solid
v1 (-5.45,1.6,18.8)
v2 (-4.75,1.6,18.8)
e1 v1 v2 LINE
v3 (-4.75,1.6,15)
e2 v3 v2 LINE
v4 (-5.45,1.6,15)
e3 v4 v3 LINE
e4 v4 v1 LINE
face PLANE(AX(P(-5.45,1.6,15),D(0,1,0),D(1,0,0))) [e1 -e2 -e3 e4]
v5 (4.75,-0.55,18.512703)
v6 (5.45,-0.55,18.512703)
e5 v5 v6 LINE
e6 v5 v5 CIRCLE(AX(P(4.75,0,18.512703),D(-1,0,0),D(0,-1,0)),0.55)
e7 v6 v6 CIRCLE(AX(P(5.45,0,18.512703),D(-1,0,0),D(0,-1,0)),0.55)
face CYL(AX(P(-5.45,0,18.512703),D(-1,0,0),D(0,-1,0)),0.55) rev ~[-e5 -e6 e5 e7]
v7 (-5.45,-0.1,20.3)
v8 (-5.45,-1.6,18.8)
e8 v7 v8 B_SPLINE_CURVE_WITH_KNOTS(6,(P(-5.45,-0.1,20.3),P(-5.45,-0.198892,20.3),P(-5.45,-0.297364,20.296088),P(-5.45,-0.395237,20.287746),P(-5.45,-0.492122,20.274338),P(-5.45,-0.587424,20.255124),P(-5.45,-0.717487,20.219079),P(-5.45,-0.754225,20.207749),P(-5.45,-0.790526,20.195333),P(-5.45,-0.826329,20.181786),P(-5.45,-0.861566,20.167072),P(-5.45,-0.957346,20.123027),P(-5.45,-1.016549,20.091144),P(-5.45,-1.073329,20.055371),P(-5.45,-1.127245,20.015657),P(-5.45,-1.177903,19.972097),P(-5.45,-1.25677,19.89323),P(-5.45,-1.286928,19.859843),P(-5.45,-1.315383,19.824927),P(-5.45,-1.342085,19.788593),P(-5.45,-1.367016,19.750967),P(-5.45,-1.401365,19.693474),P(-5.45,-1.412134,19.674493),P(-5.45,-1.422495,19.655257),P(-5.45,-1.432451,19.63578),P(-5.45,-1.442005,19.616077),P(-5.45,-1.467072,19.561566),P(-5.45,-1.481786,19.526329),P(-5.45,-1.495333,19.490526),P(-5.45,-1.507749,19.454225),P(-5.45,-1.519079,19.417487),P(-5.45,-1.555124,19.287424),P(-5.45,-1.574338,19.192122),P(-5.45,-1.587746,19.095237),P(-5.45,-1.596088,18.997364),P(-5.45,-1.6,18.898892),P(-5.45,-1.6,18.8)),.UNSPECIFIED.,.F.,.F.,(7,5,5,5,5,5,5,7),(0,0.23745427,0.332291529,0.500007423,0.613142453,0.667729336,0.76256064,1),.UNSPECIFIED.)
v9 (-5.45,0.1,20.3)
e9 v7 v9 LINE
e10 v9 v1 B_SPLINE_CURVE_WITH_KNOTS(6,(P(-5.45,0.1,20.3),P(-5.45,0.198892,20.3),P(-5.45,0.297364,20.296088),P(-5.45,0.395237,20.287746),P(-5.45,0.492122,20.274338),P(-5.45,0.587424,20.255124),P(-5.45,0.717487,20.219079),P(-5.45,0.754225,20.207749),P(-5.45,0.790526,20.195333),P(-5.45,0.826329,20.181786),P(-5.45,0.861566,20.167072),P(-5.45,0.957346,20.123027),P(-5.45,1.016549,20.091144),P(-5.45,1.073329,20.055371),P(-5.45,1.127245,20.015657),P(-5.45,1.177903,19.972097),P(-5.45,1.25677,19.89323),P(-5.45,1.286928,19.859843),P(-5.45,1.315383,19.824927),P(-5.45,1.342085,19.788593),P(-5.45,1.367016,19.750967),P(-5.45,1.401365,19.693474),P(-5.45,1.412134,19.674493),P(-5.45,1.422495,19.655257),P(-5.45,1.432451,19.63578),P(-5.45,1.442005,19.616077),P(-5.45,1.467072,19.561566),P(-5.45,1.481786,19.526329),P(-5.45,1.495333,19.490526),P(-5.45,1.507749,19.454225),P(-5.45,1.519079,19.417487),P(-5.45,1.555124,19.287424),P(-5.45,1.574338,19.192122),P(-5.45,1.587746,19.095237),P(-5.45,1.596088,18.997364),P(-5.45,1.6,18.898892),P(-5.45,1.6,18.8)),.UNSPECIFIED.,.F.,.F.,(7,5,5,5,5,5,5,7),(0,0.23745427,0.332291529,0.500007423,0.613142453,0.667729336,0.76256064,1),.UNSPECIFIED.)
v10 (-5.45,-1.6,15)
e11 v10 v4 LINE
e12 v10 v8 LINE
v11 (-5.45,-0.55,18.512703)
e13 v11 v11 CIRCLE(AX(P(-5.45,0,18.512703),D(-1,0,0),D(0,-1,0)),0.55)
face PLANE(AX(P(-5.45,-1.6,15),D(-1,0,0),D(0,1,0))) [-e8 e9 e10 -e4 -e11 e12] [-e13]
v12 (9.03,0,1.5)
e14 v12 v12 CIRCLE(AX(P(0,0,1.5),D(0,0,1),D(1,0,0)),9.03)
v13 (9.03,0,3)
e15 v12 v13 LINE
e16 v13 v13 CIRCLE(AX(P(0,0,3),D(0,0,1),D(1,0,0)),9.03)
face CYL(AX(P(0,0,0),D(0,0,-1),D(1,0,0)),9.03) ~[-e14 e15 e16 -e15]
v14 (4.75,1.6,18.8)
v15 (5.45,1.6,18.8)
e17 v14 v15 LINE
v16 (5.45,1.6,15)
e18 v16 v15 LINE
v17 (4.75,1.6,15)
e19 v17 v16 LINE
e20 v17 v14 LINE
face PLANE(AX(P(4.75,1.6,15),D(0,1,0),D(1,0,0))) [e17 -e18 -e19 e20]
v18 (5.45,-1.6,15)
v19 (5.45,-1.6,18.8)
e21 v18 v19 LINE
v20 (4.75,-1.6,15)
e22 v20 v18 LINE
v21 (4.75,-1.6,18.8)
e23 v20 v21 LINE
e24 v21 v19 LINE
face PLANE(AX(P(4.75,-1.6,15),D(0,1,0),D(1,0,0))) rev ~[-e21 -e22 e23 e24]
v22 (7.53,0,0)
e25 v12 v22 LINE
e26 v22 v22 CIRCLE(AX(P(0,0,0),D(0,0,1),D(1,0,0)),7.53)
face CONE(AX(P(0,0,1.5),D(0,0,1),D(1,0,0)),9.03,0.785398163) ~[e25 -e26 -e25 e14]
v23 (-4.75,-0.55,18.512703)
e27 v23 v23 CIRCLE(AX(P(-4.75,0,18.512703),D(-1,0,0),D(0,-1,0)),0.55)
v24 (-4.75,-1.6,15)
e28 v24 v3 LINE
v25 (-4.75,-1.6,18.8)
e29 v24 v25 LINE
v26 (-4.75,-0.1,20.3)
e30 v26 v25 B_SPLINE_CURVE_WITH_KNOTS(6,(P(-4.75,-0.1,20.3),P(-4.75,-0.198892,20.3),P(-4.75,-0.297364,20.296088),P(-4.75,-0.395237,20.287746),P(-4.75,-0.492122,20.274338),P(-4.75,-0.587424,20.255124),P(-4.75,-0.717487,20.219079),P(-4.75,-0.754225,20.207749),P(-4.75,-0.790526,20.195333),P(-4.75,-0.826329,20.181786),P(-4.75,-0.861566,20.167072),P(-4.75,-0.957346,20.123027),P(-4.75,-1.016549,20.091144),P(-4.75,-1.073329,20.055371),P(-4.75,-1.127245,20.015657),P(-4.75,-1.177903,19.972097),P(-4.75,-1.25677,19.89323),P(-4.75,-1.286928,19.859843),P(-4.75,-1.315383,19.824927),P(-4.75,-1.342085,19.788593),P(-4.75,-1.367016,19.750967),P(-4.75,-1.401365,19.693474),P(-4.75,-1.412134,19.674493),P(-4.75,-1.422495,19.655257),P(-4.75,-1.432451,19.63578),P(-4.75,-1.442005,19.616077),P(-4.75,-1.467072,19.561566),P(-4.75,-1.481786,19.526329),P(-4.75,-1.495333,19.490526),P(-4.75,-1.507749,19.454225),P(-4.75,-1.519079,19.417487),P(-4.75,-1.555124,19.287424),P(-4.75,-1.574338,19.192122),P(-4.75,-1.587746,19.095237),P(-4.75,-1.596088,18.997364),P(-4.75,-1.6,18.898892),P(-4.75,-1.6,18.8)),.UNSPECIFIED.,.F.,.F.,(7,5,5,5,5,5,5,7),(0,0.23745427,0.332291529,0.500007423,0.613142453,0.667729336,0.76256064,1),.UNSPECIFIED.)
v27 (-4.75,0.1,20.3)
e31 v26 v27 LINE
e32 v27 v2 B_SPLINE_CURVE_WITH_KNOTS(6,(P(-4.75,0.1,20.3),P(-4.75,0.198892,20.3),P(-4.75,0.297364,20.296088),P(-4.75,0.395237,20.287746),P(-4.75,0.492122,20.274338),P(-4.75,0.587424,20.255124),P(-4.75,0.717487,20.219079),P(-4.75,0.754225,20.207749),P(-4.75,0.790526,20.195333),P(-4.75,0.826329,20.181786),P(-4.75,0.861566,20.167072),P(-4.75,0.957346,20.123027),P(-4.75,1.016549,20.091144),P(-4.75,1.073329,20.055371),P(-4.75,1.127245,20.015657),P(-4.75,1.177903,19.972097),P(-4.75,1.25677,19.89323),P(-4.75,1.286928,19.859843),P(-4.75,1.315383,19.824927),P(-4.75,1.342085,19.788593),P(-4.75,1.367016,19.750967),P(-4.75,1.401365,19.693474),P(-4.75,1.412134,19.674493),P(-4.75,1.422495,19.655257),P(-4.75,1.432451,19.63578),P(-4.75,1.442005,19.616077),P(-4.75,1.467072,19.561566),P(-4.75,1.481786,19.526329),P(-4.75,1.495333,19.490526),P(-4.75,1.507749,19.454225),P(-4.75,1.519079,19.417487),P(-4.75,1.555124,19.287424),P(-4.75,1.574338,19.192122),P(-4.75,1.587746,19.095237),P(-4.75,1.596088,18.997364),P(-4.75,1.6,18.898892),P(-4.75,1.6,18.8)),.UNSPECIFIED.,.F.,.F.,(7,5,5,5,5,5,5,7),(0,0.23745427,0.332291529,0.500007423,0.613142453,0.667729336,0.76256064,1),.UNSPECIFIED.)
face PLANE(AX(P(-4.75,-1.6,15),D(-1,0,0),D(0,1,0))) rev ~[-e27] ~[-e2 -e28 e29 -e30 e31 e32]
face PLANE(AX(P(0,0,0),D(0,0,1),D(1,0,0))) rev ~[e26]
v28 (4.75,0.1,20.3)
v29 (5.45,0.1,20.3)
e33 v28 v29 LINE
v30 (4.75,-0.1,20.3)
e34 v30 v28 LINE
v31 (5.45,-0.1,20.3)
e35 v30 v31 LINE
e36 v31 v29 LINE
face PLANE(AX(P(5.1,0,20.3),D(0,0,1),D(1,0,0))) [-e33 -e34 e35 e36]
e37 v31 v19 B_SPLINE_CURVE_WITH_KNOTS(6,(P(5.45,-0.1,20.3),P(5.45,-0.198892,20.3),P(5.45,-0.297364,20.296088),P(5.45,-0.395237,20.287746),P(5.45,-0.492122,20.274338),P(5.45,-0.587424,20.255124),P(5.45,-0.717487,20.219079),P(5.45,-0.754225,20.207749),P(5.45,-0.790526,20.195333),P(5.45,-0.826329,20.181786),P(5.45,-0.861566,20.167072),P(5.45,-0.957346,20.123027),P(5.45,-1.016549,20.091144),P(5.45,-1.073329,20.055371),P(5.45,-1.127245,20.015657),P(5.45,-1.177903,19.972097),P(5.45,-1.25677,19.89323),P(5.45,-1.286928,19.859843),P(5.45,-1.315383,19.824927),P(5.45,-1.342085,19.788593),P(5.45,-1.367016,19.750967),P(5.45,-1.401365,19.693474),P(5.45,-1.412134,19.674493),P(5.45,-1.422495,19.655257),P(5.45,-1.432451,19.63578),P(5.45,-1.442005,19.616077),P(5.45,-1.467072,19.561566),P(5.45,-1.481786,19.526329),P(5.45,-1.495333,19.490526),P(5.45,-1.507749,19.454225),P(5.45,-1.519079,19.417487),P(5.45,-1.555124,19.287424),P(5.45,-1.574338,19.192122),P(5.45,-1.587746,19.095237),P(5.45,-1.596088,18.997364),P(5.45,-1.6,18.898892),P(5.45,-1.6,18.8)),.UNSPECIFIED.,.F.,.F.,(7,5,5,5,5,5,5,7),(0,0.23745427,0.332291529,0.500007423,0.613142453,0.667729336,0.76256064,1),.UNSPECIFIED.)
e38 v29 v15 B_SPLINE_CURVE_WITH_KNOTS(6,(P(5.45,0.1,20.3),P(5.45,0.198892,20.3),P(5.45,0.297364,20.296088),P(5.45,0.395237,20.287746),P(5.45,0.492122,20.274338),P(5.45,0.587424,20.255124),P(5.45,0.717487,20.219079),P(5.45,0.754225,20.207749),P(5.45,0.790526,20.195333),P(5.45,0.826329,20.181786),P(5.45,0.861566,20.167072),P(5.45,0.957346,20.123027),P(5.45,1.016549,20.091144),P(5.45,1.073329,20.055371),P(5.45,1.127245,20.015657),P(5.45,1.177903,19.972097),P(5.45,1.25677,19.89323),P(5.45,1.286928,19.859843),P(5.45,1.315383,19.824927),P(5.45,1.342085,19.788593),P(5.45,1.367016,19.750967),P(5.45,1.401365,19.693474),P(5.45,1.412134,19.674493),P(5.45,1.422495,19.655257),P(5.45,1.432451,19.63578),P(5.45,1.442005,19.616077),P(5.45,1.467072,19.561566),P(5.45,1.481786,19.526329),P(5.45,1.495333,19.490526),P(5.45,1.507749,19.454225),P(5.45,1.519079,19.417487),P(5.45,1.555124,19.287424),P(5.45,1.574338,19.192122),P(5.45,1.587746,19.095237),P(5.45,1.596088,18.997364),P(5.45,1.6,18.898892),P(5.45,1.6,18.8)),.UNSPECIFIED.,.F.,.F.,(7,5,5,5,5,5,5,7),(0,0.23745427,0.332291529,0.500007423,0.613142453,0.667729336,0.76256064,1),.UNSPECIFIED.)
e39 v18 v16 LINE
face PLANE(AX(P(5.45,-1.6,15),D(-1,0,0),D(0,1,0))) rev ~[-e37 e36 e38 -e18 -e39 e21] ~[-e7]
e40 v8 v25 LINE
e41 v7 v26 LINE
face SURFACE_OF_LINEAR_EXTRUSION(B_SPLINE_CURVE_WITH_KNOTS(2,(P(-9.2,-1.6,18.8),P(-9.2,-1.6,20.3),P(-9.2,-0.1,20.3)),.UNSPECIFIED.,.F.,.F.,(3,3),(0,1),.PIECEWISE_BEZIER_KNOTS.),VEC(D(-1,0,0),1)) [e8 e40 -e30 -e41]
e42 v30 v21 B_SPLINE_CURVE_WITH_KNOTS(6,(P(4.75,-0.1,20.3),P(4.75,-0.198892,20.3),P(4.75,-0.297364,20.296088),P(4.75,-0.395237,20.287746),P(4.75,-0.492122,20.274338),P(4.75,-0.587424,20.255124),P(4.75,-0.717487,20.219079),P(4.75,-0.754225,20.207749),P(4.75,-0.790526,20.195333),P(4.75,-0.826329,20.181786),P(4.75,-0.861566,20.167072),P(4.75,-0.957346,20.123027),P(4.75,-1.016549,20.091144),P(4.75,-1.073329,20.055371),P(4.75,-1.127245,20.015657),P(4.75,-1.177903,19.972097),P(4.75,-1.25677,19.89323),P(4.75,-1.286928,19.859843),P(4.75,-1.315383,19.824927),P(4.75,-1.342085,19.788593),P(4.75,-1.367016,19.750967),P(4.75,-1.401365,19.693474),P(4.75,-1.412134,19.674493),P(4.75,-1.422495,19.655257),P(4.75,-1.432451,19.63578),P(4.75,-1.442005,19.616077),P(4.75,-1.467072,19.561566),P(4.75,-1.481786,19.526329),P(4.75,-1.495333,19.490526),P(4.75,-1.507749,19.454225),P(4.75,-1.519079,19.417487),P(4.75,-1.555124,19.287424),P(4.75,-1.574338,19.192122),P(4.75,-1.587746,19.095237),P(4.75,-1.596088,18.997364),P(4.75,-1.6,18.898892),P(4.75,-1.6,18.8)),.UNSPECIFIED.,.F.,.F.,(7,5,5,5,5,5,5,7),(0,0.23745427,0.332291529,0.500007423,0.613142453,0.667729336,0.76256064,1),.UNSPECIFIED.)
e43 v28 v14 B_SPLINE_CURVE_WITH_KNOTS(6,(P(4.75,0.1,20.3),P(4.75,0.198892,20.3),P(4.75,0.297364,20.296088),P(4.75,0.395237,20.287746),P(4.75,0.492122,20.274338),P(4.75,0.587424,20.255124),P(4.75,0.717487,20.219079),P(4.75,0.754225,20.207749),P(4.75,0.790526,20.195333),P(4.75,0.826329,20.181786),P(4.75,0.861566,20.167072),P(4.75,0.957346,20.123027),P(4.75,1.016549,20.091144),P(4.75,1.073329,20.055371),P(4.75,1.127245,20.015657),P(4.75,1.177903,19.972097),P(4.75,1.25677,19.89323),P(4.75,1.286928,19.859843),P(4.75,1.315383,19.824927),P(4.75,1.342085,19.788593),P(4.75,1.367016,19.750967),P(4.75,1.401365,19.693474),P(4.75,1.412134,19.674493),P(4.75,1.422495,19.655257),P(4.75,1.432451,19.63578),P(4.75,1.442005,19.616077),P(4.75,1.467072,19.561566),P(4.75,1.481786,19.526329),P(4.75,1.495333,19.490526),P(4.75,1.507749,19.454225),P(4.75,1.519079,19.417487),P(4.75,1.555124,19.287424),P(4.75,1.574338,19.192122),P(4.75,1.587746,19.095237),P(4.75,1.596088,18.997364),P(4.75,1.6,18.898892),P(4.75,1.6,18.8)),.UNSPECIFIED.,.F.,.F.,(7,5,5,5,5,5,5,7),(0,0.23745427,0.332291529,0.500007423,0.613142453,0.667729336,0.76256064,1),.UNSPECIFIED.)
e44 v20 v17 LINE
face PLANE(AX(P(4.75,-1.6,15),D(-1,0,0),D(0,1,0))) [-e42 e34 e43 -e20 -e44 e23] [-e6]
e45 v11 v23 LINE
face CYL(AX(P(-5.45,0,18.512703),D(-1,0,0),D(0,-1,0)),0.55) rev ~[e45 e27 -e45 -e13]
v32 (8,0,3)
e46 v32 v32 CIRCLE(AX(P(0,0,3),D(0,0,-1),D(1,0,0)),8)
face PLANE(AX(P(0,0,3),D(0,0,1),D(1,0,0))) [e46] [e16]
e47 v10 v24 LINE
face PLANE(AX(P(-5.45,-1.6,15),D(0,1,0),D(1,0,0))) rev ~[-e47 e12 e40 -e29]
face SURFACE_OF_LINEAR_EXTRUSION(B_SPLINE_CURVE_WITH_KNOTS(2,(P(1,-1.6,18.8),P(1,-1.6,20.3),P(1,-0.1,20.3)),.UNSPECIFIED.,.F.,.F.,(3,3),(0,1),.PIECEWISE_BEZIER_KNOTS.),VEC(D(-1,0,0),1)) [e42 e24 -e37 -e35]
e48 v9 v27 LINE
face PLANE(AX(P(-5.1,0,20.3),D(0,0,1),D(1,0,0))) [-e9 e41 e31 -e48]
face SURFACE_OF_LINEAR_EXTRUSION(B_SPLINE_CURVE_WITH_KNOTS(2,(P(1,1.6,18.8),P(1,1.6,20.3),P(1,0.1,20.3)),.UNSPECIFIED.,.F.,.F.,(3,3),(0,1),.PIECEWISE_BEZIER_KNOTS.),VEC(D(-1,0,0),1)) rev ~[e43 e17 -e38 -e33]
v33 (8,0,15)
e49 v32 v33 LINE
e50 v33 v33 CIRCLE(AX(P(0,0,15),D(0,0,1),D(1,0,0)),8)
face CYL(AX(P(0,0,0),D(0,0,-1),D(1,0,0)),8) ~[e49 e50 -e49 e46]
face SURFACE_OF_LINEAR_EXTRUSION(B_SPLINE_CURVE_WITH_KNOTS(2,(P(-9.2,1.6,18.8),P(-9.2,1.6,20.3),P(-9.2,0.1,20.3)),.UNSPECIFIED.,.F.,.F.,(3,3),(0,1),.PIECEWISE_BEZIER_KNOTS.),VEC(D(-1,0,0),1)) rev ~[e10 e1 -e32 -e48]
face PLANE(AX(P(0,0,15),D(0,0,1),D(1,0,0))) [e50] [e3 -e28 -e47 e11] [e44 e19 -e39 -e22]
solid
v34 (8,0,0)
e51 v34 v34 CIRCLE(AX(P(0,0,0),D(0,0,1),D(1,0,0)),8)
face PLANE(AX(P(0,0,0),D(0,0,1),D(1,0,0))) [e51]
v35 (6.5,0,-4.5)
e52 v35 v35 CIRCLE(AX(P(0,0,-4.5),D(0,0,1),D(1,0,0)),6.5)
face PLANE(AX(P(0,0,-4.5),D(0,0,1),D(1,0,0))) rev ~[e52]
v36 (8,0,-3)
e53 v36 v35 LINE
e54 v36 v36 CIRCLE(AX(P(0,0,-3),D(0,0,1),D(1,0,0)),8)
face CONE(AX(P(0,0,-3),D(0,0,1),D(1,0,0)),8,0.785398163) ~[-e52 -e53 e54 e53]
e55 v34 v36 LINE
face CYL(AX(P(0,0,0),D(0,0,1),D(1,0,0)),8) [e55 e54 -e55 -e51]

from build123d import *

# Parameters (mm, degrees)
F0_R        = 8
F1_DEPTH    = 15
F0_R_2      = 9.03
F2_DEPTH    = 3
F3_DEPTH    = 4.5
F4_SIZE     = 1.5
F4_2_SIZE   = 1.5
F5_W        = 0.7
F5_H        = 3.2
F6_DEPTH    = 5.3
F7_R        = 0.55
F8_DEPTH    = 25
F9_T1_DEPTH = 8.2
F9_T3_DEPTH = 8.2


# Not quite as in the source:
# - a fillet or chamfer that OpenCascade refuses, or shapes differently, is made with other operations: its cross-section is extruded or revolved along the edge and cut away or added


with BuildPart() as f1:
    # F0 (on Top) → F1 (new body)
    with BuildSketch(Plane.XY):
        Circle(F0_R)
    extrude(amount=F1_DEPTH)

    # F0 (on Top) → F2 (join)
    with BuildSketch(Plane.XY):
        Circle(F0_R_2)
        Circle(F0_R, mode=Mode.SUBTRACT)
        Circle(F0_R)
    extrude(amount=F2_DEPTH)

    # F4#2
    f4_2_edges = [f1.edges().sort_by_distance(p)[0] for p in [
        (-9.03, 0, 0),
    ]]
    chamfer(f4_2_edges, length=F4_2_SIZE)

    # F5 (on face) → F6 (join)
    with BuildSketch(Plane.XY.offset(15)):
        with Locations((-5.1, 0)):
            Rectangle(F5_W, F5_H)
        with Locations((5.1, 0)):
            Rectangle(F5_W, F5_H)
    extrude(amount=F6_DEPTH)

    # F7 (on face) → F8 (cut)
    with BuildSketch(Plane(origin=(-5.45, 0, 0), x_dir=(0, -1, 0), z_dir=(-1, 0, 0))):
        with Locations((0, 18.5127034783)):
            Circle(F7_R)
    extrude(amount=-F8_DEPTH, mode=Mode.SUBTRACT)

    # F9: fillet of radius 1.5 on 4 edges, made by hand

    # F9_s2 → F9_t1 (cut)
    with BuildSketch(Plane.YZ.offset(-9.2)):
        with BuildLine():
            add(Edge.make_bspline(
                [(-1.6, 18.8), (-1.6, 20.3), (-0.1, 20.3)],
                knots=[0, 0, 0, 1, 1, 1], degree=2, weights=[1, 1, 1]))
            Line((-0.1, 20.3), (-1.6, 20.3))
            Line((-1.6, 20.3), (-1.6, 18.8))
        make_face()
        with BuildLine():
            add(Edge.make_bspline(
                [(1.6, 18.8), (1.6, 20.3), (0.1, 20.3)],
                knots=[0, 0, 0, 1, 1, 1], degree=2, weights=[1, 1, 1]))
            Line((0.1, 20.3), (1.6, 20.3))
            Line((1.6, 20.3), (1.6, 18.8))
        make_face()
    extrude(amount=F9_T1_DEPTH, mode=Mode.SUBTRACT)

    # F9_s4 → F9_t3 (cut)
    with BuildSketch(Plane.YZ.offset(1)):
        with BuildLine():
            add(Edge.make_bspline(
                [(-1.6, 18.8), (-1.6, 20.3), (-0.1, 20.3)],
                knots=[0, 0, 0, 1, 1, 1], degree=2, weights=[1, 1, 1]))
            Line((-0.1, 20.3), (-1.6, 20.3))
            Line((-1.6, 20.3), (-1.6, 18.8))
        make_face()
        with BuildLine():
            add(Edge.make_bspline(
                [(1.6, 18.8), (1.6, 20.3), (0.1, 20.3)],
                knots=[0, 0, 0, 1, 1, 1], degree=2, weights=[1, 1, 1]))
            Line((0.1, 20.3), (1.6, 20.3))
            Line((1.6, 20.3), (1.6, 18.8))
        make_face()
    extrude(amount=F9_T3_DEPTH, mode=Mode.SUBTRACT)


with BuildPart() as f3:
    # F0 (on Top) → F3 (new body)
    with BuildSketch(Plane.XY):
        Circle(F0_R)
    extrude(amount=-F3_DEPTH)

    # F4
    f4_edges = [f3.edges().sort_by_distance(p)[0] for p in [
        (-8, 0, -4.5),
    ]]
    chamfer(f4_edges, length=F4_SIZE)


solid = Compound([f1.part, f3.part])
